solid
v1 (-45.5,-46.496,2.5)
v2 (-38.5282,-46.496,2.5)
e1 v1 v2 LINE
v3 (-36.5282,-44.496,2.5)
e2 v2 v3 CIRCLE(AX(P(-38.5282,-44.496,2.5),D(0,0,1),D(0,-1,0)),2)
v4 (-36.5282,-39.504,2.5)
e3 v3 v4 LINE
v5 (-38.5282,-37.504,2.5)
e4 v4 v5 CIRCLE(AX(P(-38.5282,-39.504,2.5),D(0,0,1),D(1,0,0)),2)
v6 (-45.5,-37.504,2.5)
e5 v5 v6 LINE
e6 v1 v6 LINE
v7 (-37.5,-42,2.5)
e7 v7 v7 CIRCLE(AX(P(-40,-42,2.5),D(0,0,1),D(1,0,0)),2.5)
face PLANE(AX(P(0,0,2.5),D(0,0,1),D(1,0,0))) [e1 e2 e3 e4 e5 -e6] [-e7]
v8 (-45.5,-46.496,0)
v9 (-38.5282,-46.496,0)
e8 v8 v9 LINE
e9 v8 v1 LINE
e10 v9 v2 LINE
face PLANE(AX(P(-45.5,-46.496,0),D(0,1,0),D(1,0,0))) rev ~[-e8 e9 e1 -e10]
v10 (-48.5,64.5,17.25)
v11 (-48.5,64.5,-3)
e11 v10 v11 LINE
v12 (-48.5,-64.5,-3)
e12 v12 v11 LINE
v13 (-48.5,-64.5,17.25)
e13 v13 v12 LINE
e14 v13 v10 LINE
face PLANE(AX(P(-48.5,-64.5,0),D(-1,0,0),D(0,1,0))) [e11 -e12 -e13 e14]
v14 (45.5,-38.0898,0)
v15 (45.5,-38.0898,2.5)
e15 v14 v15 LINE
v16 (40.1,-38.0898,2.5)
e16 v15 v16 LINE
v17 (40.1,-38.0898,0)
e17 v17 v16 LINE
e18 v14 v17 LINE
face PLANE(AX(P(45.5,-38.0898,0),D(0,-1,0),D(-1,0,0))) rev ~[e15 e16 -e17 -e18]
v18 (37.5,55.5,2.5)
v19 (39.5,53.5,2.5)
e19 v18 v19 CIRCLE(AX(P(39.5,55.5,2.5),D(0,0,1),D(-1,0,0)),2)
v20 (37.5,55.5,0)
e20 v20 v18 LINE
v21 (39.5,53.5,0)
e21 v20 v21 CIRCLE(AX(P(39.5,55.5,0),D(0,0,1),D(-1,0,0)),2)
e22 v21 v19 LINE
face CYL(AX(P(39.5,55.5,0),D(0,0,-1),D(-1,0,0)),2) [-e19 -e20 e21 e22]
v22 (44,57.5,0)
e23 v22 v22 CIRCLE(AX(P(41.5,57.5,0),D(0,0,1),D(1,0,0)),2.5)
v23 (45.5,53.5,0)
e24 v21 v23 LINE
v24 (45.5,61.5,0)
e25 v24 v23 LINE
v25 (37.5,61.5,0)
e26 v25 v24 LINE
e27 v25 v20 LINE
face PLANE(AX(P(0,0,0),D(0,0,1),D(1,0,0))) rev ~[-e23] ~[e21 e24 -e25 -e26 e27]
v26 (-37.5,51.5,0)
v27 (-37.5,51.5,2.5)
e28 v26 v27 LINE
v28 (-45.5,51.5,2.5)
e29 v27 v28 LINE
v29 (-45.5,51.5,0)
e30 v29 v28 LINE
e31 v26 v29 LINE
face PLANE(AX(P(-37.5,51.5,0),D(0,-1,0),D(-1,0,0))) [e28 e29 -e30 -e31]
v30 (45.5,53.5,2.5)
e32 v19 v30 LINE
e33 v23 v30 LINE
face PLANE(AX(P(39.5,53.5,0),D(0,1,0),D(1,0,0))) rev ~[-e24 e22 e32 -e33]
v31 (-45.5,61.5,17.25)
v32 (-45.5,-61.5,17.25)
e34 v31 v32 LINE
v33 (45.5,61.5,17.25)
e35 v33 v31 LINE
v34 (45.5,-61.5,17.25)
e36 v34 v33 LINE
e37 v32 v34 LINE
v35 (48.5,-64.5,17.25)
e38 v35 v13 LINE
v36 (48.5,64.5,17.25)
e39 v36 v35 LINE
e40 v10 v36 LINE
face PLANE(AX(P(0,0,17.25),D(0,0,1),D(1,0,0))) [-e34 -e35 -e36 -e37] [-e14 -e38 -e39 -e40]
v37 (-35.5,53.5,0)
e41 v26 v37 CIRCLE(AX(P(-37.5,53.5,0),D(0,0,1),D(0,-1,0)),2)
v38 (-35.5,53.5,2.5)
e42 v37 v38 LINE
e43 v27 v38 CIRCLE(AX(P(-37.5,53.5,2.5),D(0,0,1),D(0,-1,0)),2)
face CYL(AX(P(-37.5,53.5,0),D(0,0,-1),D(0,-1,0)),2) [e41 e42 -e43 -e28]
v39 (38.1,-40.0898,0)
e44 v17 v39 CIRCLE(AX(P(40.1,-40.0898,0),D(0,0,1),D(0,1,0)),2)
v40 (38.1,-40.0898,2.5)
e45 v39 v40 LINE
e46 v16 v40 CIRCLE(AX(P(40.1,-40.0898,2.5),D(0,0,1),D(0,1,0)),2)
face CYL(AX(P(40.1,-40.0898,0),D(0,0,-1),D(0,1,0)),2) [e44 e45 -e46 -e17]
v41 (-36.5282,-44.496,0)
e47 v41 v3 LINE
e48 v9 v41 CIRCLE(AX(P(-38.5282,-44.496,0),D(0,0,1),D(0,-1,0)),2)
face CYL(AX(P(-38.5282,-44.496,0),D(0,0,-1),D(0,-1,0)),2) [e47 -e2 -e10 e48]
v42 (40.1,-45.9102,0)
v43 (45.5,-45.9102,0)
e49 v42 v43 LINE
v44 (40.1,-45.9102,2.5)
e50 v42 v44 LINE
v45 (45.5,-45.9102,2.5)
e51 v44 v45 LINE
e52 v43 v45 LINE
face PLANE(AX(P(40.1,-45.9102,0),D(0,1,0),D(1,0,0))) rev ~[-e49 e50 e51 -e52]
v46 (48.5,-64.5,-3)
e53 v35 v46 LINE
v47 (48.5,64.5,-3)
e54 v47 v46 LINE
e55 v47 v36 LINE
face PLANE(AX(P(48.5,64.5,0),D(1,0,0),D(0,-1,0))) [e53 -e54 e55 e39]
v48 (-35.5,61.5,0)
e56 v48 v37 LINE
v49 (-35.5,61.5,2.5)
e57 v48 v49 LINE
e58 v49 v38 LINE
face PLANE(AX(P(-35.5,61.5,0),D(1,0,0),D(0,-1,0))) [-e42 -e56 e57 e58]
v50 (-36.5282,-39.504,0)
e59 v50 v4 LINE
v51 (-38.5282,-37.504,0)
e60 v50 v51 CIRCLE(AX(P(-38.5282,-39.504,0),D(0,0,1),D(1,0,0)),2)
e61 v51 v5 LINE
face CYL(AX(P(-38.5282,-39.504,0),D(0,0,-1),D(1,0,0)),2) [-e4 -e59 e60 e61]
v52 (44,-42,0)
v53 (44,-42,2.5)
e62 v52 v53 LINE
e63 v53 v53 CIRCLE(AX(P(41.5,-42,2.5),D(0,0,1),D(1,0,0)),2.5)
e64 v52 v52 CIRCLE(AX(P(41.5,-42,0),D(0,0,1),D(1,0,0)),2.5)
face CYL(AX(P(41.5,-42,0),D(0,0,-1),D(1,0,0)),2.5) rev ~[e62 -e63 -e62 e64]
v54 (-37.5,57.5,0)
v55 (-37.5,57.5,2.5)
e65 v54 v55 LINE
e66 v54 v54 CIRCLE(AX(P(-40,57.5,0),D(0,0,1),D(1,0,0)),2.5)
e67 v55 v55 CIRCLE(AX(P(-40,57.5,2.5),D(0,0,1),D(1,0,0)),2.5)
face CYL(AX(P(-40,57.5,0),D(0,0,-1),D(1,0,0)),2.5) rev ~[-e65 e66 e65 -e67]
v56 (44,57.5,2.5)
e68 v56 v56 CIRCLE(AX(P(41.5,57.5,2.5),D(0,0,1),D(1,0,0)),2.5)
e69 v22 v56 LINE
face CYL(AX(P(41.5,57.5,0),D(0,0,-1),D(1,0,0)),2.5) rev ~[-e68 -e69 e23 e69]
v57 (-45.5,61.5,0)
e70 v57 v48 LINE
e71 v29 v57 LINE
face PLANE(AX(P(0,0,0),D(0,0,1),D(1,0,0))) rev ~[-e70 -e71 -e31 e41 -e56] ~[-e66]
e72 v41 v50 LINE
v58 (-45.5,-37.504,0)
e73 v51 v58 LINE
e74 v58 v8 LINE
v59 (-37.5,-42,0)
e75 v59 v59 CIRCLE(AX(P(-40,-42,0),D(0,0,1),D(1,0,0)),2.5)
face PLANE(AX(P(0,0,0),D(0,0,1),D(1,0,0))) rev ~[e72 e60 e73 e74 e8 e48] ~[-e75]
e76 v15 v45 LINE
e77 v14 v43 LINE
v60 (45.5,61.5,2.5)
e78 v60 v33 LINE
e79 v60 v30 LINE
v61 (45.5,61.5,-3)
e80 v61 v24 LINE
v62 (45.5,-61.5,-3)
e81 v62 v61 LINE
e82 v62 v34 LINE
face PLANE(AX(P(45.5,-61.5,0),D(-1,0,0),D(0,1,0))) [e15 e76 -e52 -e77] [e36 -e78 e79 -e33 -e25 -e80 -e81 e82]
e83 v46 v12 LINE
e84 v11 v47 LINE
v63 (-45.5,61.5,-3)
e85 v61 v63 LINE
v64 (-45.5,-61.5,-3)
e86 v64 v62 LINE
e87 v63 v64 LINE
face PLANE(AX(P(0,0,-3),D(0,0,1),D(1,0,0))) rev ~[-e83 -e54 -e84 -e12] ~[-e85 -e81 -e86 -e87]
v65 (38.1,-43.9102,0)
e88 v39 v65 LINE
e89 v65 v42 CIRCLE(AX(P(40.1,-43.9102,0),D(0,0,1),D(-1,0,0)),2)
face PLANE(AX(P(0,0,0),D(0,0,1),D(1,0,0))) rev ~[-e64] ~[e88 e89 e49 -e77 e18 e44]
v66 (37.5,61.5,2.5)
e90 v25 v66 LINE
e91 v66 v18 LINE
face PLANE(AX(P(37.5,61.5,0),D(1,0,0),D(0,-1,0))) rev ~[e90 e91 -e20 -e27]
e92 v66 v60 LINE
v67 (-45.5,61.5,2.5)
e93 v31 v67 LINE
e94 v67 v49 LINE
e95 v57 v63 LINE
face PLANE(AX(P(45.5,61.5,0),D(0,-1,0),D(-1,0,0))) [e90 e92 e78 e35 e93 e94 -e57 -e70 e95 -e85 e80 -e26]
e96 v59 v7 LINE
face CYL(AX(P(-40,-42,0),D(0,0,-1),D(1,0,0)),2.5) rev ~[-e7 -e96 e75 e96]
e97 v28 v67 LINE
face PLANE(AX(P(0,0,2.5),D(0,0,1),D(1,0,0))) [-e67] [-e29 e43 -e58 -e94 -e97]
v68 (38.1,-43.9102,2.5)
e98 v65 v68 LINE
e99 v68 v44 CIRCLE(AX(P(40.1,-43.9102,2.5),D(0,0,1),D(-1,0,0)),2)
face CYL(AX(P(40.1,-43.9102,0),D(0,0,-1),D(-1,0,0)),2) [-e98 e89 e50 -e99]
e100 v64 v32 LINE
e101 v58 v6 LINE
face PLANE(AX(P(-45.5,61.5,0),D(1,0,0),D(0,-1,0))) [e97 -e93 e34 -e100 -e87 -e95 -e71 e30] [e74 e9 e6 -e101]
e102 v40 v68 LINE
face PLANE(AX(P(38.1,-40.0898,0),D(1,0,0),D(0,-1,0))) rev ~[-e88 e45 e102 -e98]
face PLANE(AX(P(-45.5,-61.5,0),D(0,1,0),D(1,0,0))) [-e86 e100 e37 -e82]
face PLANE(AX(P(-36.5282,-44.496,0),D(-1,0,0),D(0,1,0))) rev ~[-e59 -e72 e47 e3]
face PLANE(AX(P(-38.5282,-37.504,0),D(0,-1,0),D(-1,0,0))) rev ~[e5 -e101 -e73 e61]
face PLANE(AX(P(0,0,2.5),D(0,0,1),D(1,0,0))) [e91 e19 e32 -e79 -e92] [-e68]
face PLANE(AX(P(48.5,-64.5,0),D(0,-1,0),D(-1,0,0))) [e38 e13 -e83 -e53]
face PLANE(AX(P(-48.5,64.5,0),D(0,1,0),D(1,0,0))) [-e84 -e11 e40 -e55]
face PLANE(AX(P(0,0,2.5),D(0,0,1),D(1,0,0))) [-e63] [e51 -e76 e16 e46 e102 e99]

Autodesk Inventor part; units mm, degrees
ref_plane "YZ Plane" through (0, 0, 0) normal (1, 0, 0) x (0, 1, 0)
ref_plane "XZ Plane" through (0, 0, 0) normal (0, 1, 0) x (-1, 0, 0)
ref_plane "Piano di lavoro1" through (0, 0, 0) normal (0, 0, 1) x (1, 0, 0)
sketch "Schizzo1" plane through (0, 0, 0) normal (0, 0, 1) x (1, 0, 0)
  line L0 (42, 54.3) -> (-33, 54.3) projected
  line L1 (42, 19.3) -> (42, 54.3) projected
  line L2 (-45, -61) -> (45, -61) projected
  line L3 (-45, 61) -> (-45, -61) projected
  line L4 (45, 61) -> (-45, 61) projected
  circle A0 centre (-40, 57.5) radius 2.5 projected
  circle A1 centre (-40, -42) radius 2.5 projected
  circle A2 centre (41.5, -42) radius 2.5 projected
  circle A3 centre (41.5, 57.5) radius 2.5 projected
  line L5 (45, -61) -> (45, 61) projected
  line L6 (-45.5, 61.5) -> (-45.5, -61.5)
  line L7 (-45.5, -61.5) -> (45.5, -61.5)
  line L8 (45.5, -61.5) -> (45.5, 61.5)
  line L9 (45.5, 61.5) -> (-45.5, 61.5)
  line L10 (48.5, 64.5) -> (48.5, -64.5)
  line L11 (48.5, -64.5) -> (-48.5, -64.5)
  line L12 (-48.5, -64.5) -> (-48.5, 64.5)
  line L13 (-48.5, 64.5) -> (48.5, 64.5)
  point P0 (0, 0)
  dimension "d0" = 0.5
  dimension "d1" = 3
extrude "Estrusione1" add sketch "Schizzo1" along normal blind 17.25 contours L10 L11 L12 L13
move faces "Sposta1" translate (0, 0, -3) faces at (-47.5, 20.5, 0)
sketch "Schizzo2" plane through (0, 0, 0) normal (0, 0, 1) x (1, 0, 0)
  circle A0 centre (41.5, 57.5) radius 2.5 projected
  circle A1 centre (-40, 57.5) radius 2.5 projected
  circle A2 centre (41.5, -42) radius 2.5 projected
  circle A3 centre (-40, -42) radius 2.5 projected
  line L0 (-45.5, 61.5) -> (45.5, 61.5) projected
  line L1 (-45.5, 61.5) -> (45.5, 61.5) projected
  line L2 (45.5, 61.5) -> (45.5, -61.5) projected
  line L3 (45.5, 61.5) -> (45.5, -61.5) projected
  line L4 (-45.5, -61.5) -> (-45.5, 61.5) projected
  line L5 (-45.5, -61.5) -> (-45.5, 61.5) projected
  line L6 (45.5, -61.5) -> (-45.5, -61.5) projected
  line L7 (45.5, -61.5) -> (-45.5, -61.5) projected
  line L8 (45.5, 61.5) -> (37.5, 61.5)
  line L9 (37.5, 61.5) -> (37.5, 55.5)
  line L10 (39.5, 53.5) -> (45.5, 53.5)
  line L11 (45.5, 53.5) -> (45.5, 61.5)
  arc A4 (37.5, 55.5) -> (39.5, 53.5) centre (39.5, 55.5) ccw
  line L12 (-45.5, 61.5) -> (-35.5, 61.5)
  line L13 (-35.5, 61.5) -> (-35.5, 53.5)
  line L14 (-37.5, 51.5) -> (-45.5, 51.5)
  line L15 (-45.5, 51.5) -> (-45.5, 61.5)
  arc A5 (-37.5, 51.5) -> (-35.5, 53.5) centre (-37.5, 53.5) ccw
  line L16 (-45.5, -61.5) -> (-45.5, 61.5) projected
  line L17 (-45.5, -37.8875) -> (-45.5, -46.8794)
  line L18 (-45.5, -46.496) -> (-38.5282, -46.496)
  line L19 (-36.5282, -44.496) -> (-36.5282, -39.504)
  line L20 (-38.5282, -37.504) -> (-45.5, -37.504)
  arc A6 (-38.5282, -46.496) -> (-36.5282, -44.496) centre (-38.5282, -44.496) ccw
  arc A7 (-36.5282, -39.504) -> (-38.5282, -37.504) centre (-38.5282, -39.504) ccw
  line L21 (45.5, 61.5) -> (45.5, -61.5) projected
  line L22 (45.5, -45.9102) -> (45.5, -38.0898)
  line L23 (45.5, -38.0898) -> (40.1, -38.0898)
  line L24 (38.1, -40.0898) -> (38.1, -43.9102)
  line L25 (40.1, -45.9102) -> (45.5, -45.9102)
  arc A8 (38.1, -43.9102) -> (40.1, -45.9102) centre (40.1, -43.9102) ccw
  arc A9 (40.1, -38.0898) -> (38.1, -40.0898) centre (40.1, -40.0898) ccw
  point P0 (0, 0)
  point P1 (37.5, 53.5)
  point P2 (-35.5, 51.5)
  point P3 (-36.5282, -42.3835)
  point P4 (-36.5282, -42)
  point P5 (38.1, -38.0898)
  dimension "d7" = 8
  dimension "d8" = 8
  dimension "d9" = 2
  dimension "d10" = 10
  dimension "d11" = 10
  dimension "d12" = 2
  dimension "d13" = 2
  dimension "d14" = 7.4
  dimension "d15" = 2
extrude "Estrusione2" add sketch "Schizzo2" along normal blind 2.5 contours L0 L13 A5 L14 L4 | L0 L2 L10 A4 L9 | L20 A7 L19 A6 L18 L4 | L2 L25 A8 L24 A9 L23
properties part number "_Stampa 3D"
